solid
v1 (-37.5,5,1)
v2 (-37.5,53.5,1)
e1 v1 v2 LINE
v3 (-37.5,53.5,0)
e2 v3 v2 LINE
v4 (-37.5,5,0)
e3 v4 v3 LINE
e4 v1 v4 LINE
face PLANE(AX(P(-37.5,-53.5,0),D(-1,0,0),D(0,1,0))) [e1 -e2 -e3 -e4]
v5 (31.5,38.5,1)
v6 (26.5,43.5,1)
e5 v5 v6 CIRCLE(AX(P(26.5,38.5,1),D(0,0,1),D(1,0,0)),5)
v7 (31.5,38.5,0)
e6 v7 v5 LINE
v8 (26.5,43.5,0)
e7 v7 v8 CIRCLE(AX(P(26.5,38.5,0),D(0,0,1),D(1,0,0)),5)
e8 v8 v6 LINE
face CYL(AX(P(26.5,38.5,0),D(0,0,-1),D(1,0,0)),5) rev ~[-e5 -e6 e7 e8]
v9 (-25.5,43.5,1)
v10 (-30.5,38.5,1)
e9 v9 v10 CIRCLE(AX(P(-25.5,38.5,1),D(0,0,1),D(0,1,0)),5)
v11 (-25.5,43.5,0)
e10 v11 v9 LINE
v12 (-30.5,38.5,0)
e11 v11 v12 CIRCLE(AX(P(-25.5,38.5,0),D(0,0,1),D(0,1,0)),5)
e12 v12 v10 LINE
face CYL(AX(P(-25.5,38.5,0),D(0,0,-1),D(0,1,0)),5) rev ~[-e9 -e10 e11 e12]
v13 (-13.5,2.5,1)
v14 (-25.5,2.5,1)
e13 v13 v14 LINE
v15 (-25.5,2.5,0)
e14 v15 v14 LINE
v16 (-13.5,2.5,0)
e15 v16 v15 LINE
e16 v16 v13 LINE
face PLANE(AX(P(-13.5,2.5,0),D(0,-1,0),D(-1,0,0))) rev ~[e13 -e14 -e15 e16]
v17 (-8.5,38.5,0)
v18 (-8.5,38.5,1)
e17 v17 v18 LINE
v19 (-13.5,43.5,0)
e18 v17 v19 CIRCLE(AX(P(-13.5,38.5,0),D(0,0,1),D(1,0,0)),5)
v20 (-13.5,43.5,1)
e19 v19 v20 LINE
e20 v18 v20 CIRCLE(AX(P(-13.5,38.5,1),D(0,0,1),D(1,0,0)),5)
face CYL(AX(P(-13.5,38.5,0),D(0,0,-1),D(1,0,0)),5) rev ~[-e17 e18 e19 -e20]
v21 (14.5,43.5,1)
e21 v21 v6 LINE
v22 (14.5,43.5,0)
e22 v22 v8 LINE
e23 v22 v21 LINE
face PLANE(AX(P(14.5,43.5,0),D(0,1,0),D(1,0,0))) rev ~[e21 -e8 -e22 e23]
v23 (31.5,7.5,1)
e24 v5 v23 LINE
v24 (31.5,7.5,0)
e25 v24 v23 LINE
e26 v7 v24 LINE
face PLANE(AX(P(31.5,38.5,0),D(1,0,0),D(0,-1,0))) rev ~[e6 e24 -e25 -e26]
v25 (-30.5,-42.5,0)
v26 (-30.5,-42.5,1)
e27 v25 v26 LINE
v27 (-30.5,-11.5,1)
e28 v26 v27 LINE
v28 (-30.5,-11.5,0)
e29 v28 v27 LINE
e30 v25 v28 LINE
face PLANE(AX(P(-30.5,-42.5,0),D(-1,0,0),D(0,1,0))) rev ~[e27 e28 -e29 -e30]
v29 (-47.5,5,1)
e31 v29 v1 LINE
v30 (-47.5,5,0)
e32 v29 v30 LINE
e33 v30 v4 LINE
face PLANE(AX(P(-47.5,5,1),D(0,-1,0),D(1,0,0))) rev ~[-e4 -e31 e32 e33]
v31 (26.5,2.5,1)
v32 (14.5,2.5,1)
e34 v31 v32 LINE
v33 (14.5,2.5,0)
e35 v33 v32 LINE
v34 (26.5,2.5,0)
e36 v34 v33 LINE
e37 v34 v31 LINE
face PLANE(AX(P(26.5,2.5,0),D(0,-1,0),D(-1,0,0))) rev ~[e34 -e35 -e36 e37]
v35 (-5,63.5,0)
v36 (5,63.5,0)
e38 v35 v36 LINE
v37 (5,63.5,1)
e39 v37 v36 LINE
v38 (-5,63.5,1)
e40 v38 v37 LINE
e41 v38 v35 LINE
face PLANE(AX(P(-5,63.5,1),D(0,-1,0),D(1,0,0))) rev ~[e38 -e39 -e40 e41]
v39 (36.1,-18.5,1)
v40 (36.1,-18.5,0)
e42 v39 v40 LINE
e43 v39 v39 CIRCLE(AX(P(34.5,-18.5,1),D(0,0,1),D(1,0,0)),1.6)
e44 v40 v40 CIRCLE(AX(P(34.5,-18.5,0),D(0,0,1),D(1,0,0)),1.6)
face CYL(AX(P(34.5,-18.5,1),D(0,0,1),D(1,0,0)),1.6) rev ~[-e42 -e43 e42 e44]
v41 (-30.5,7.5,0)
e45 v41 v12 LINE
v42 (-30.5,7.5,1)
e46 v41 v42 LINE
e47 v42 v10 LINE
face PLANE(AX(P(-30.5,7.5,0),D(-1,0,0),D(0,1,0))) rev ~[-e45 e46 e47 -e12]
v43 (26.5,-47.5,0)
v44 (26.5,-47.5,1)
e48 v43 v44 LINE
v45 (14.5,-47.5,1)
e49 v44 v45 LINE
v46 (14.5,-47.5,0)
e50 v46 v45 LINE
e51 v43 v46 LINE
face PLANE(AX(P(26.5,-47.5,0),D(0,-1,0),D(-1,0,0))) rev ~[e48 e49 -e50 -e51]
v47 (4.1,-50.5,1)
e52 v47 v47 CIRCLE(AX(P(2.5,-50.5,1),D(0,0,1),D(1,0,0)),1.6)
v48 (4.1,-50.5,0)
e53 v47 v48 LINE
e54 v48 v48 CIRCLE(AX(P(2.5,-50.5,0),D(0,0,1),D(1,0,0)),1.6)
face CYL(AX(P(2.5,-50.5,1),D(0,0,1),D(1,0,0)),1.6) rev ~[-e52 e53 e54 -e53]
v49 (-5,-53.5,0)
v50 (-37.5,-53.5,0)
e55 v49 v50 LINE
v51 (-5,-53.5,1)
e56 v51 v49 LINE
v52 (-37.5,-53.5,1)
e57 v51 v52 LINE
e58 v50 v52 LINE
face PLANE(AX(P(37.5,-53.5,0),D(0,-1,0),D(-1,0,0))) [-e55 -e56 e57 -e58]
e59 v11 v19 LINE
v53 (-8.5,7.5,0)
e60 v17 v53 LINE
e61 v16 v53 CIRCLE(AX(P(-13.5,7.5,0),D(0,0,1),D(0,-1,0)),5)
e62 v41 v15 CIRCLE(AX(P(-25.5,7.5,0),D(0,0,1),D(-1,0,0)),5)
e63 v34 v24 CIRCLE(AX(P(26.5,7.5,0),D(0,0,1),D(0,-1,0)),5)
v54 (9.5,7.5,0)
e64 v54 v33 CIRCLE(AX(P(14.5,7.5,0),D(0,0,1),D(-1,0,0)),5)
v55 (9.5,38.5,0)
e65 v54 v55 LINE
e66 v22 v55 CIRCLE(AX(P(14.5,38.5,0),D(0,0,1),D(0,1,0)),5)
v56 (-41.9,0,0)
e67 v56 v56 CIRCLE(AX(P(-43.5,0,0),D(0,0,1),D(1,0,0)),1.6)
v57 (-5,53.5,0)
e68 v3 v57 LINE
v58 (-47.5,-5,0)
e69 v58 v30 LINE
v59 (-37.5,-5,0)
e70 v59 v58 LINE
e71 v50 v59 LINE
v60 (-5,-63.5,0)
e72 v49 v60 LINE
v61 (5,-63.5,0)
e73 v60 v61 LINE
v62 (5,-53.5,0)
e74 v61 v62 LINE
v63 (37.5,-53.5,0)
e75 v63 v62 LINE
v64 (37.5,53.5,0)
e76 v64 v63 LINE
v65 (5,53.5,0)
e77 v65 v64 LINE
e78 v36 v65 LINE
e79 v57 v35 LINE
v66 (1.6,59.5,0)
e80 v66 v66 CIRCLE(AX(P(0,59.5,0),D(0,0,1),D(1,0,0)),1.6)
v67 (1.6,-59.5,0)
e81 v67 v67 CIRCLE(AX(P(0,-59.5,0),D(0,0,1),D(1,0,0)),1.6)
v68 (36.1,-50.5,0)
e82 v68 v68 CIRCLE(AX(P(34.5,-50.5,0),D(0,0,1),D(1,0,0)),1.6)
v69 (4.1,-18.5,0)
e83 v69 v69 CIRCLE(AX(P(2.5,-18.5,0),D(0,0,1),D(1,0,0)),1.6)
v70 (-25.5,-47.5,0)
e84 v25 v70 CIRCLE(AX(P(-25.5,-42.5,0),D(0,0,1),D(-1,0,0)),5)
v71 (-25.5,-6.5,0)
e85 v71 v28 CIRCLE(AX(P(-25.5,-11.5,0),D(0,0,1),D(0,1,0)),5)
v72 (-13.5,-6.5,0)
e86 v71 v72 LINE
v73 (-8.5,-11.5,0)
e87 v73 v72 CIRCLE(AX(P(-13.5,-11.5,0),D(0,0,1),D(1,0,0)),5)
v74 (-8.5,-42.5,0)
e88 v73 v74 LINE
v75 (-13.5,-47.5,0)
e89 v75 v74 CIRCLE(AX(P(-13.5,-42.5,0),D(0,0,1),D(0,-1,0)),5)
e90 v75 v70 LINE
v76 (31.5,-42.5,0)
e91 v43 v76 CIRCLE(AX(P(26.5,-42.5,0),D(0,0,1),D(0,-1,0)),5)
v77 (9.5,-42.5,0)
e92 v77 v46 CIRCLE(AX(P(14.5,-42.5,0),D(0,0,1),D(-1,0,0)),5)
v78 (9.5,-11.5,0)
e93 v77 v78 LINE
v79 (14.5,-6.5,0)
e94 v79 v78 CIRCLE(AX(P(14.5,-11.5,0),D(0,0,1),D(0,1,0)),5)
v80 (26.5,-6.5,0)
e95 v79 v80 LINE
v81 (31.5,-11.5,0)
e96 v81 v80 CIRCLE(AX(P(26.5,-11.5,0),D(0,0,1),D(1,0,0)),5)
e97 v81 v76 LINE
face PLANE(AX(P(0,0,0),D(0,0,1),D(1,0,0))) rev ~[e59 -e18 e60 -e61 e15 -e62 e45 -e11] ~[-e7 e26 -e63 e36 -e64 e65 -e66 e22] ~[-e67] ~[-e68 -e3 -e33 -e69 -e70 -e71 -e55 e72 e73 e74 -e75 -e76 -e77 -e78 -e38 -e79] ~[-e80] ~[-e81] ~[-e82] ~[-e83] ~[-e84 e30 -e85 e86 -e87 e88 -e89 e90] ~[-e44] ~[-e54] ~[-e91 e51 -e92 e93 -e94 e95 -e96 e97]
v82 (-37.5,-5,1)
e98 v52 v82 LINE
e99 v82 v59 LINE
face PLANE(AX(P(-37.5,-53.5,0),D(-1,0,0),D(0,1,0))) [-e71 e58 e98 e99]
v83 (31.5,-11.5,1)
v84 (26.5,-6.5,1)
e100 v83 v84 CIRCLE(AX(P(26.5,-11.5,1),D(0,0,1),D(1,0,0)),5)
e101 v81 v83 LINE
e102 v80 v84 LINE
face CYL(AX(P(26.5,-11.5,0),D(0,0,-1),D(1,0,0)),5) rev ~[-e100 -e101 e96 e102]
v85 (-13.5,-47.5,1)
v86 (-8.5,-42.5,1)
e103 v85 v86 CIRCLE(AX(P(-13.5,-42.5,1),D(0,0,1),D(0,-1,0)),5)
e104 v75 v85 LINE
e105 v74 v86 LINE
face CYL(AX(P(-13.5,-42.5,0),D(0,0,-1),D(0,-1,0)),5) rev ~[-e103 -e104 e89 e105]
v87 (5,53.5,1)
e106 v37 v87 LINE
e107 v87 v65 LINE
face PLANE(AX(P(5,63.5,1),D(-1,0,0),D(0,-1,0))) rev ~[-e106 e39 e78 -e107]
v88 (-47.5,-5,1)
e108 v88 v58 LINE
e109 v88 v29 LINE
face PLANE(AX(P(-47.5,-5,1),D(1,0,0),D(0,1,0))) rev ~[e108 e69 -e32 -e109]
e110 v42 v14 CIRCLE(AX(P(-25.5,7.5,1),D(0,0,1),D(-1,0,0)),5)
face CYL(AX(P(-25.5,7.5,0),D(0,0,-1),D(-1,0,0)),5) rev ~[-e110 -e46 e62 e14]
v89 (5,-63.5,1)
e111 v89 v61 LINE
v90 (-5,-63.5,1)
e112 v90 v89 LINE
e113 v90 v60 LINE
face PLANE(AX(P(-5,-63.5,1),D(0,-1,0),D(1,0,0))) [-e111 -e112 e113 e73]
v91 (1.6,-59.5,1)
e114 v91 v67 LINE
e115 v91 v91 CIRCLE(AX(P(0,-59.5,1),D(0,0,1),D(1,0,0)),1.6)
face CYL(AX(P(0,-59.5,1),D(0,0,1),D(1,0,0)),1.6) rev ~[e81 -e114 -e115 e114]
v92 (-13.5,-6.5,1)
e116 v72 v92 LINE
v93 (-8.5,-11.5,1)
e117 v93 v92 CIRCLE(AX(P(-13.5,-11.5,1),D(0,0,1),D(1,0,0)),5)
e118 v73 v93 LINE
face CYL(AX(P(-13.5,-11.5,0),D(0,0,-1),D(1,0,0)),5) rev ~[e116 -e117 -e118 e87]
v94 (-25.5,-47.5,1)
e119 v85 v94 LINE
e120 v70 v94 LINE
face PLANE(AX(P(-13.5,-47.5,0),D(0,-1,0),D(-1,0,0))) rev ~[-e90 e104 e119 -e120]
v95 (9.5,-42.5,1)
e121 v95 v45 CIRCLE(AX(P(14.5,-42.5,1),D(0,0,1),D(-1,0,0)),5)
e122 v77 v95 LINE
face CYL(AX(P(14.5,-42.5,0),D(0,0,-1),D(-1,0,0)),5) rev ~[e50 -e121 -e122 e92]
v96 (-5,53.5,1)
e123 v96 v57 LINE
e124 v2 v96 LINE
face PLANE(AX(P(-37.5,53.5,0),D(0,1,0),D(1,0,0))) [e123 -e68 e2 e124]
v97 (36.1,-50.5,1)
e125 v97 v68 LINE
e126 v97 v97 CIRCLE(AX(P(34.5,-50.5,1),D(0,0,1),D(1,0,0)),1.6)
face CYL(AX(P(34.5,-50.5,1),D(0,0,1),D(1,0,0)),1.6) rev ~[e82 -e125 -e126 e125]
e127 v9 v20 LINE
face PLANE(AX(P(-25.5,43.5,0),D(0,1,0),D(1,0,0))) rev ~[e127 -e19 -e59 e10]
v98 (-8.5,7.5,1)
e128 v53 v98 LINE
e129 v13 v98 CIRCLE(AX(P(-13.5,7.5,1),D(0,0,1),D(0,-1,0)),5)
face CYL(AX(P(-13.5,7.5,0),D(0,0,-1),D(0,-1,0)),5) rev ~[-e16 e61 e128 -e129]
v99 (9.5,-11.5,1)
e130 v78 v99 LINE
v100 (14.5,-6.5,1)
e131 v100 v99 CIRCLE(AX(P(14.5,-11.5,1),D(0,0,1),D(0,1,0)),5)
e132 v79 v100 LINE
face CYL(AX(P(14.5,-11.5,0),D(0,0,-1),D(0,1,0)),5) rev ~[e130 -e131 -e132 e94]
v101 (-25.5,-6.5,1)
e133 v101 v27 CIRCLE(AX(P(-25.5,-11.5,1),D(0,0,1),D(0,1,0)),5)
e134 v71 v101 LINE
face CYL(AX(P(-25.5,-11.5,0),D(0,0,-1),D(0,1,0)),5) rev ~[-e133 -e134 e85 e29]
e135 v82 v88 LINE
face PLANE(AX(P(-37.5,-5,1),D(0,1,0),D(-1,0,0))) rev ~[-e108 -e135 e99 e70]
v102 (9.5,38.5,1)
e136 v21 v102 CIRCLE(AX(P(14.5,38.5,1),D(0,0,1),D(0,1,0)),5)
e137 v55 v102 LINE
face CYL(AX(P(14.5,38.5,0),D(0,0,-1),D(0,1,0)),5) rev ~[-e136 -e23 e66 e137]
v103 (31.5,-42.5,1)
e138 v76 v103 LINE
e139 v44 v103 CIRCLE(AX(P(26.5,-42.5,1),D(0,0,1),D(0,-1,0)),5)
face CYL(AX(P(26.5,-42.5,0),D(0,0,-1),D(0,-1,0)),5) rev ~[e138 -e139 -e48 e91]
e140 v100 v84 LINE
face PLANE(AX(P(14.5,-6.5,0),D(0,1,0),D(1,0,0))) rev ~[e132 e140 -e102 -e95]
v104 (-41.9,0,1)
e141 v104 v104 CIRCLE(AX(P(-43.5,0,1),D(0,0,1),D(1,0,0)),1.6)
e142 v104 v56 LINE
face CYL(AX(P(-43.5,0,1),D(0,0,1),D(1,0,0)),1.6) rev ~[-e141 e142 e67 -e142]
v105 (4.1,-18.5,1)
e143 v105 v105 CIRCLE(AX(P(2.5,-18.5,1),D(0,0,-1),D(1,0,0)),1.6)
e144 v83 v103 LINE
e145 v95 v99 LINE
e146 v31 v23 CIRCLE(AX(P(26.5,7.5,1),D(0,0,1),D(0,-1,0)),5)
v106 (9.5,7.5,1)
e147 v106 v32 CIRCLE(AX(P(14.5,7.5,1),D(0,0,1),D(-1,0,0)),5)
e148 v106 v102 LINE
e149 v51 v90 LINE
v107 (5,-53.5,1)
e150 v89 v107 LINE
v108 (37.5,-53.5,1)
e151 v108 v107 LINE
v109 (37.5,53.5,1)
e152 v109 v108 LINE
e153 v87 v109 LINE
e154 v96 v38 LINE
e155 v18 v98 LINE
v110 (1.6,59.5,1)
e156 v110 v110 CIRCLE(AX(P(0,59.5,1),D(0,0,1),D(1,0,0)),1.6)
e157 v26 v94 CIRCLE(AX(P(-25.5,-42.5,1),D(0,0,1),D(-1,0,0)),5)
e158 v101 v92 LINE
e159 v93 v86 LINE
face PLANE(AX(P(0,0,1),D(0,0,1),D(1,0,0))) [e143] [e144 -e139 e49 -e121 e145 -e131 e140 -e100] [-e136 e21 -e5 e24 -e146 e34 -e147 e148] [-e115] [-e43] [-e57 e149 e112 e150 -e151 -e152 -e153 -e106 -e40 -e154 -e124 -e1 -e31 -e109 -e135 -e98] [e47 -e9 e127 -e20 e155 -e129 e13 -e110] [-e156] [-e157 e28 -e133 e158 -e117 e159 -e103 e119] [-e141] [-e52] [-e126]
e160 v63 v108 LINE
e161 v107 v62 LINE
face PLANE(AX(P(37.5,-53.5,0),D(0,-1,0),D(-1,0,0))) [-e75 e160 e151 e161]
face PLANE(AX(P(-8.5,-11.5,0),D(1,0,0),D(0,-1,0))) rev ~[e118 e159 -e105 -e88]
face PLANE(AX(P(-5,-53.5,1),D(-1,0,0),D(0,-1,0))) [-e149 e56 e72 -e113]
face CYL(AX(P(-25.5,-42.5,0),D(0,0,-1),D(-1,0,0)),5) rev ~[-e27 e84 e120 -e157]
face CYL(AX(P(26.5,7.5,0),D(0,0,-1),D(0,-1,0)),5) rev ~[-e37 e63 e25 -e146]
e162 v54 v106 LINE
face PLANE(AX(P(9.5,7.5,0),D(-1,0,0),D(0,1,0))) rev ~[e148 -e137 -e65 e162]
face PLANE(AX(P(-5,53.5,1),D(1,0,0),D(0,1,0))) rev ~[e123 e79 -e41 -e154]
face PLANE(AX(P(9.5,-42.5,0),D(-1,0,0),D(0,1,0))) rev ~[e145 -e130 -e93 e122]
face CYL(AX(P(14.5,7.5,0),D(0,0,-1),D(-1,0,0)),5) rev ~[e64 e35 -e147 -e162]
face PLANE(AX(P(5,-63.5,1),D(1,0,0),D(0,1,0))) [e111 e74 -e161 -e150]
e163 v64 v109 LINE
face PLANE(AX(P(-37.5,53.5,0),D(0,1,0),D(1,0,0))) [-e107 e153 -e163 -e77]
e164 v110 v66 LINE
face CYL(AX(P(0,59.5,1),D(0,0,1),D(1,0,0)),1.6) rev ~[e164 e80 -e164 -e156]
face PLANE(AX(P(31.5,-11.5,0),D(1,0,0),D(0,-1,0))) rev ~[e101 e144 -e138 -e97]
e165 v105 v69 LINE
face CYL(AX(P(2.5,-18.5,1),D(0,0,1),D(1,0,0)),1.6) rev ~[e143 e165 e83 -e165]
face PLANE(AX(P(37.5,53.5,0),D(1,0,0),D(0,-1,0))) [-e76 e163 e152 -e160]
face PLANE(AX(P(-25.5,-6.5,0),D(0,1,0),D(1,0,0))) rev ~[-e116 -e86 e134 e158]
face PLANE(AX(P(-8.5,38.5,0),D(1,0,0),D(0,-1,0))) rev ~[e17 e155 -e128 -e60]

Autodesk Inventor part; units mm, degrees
ref_plane "YZ Plane" through (0, 0, 0) normal (1, 0, 0) x (0, 1, 0)
ref_plane "XZ Plane" through (0, 0, 0) normal (0, 1, 0) x (-1, 0, 0)
ref_plane "XY Plane" through (0, 0, 0) normal (0, 0, 1) x (1, 0, 0)
sketch "Sketch1" plane through (0, 0, 0) normal (0, 0, 1) x (1, 0, 0)
  line L0 (-37.5, 53.5) -> (37.5, 53.5)
  line L1 (37.5, 53.5) -> (37.5, -53.5)
  line L2 (37.5, -53.5) -> (-37.5, -53.5)
  line L3 (-37.5, -53.5) -> (-37.5, 53.5)
  line L4 (-37.5, 53.5) -> (37.5, -53.5) construction
  line L5 (37.5, 53.5) -> (-37.5, -53.5) construction
  line L6 (-25.5, 43.5) -> (-13.5, 43.5)
  line L7 (-8.5, 38.5) -> (-8.5, 7.5)
  line L8 (-13.5, 2.5) -> (-25.5, 2.5)
  line L9 (-30.5, 7.5) -> (-30.5, 38.5)
  line L10 (-30.5, 43.5) -> (-8.5, 2.5) construction
  line L11 (-8.5, 43.5) -> (-30.5, 2.5) construction
  arc A0 (-25.5, 43.5) -> (-30.5, 38.5) centre (-25.5, 38.5) ccw
  arc A1 (-8.5, 38.5) -> (-13.5, 43.5) centre (-13.5, 38.5) ccw
  arc A2 (-13.5, 2.5) -> (-8.5, 7.5) centre (-13.5, 7.5) ccw
  arc A3 (-30.5, 7.5) -> (-25.5, 2.5) centre (-25.5, 7.5) ccw
  line L12 (9.5, 7.5) -> (9.5, 38.5)
  arc A4 (26.5, 2.5) -> (31.5, 7.5) centre (26.5, 7.5) ccw
  arc A5 (14.5, 43.5) -> (9.5, 38.5) centre (14.5, 38.5) ccw
  arc A6 (31.5, 38.5) -> (26.5, 43.5) centre (26.5, 38.5) ccw
  arc A7 (9.5, 7.5) -> (14.5, 2.5) centre (14.5, 7.5) ccw
  line L13 (26.5, 2.5) -> (14.5, 2.5)
  line L14 (31.5, 38.5) -> (31.5, 7.5)
  line L15 (9.5, 43.5) -> (31.5, 2.5) construction
  line L16 (14.5, 43.5) -> (26.5, 43.5)
  line L17 (31.5, 43.5) -> (9.5, 2.5) construction
  line L18 (-30.5, -42.5) -> (-30.5, -11.5)
  arc A8 (-13.5, -47.5) -> (-8.5, -42.5) centre (-13.5, -42.5) ccw
  arc A9 (-25.5, -6.5) -> (-30.5, -11.5) centre (-25.5, -11.5) ccw
  arc A10 (-8.5, -11.5) -> (-13.5, -6.5) centre (-13.5, -11.5) ccw
  arc A11 (-30.5, -42.5) -> (-25.5, -47.5) centre (-25.5, -42.5) ccw
  line L19 (-13.5, -47.5) -> (-25.5, -47.5)
  line L20 (-8.5, -11.5) -> (-8.5, -42.5)
  line L21 (-30.5, -6.5) -> (-8.5, -47.5) construction
  line L22 (-25.5, -6.5) -> (-13.5, -6.5)
  line L23 (-8.5, -6.5) -> (-30.5, -47.5) construction
  line L24 (9.5, -42.5) -> (9.5, -11.5)
  arc A12 (26.5, -47.5) -> (31.5, -42.5) centre (26.5, -42.5) ccw
  arc A13 (14.5, -6.5) -> (9.5, -11.5) centre (14.5, -11.5) ccw
  arc A14 (31.5, -11.5) -> (26.5, -6.5) centre (26.5, -11.5) ccw
  arc A15 (9.5, -42.5) -> (14.5, -47.5) centre (14.5, -42.5) ccw
  line L25 (26.5, -47.5) -> (14.5, -47.5)
  line L26 (31.5, -11.5) -> (31.5, -42.5)
  line L27 (9.5, -6.5) -> (31.5, -47.5) construction
  line L28 (14.5, -6.5) -> (26.5, -6.5)
  line L29 (31.5, -6.5) -> (9.5, -47.5) construction
  line L30 (0, 0) -> (0, 8.3009)
  line L31 (0, 0) -> (4.4939, 0)
  point P0 (-19.5, 23)
  point P1 (20.5, 23)
  point P2 (-19.5, -27)
  point P3 (20.5, -27)
  dimension "d0" = 107
  dimension "d1" = 75
  dimension "d3" = 22
  dimension "d4" = 41
  dimension "d5" = 5
  dimension "d8" = 40
  dimension "d11" = 50
  dimension "d14" = 10
  dimension "d15" = 7
extrude "Plate1" add sketch "Sketch1" along normal blind 1
sketch "Sketch2" plane through (0, 0, 1) normal (0, 0, 1) x (1, 0, 0)
  line L0 (37.5, 53.5) -> (37.5, -53.5)
  line L1 (-37.5, -53.5) -> (-37.5, 53.5)
  line L2 (-47.5, 5) -> (-37.5, 5)
  line L3 (-37.5, 5) -> (-37.5, -5)
  line L4 (-37.5, -5) -> (-47.5, -5)
  line L5 (-47.5, -5) -> (-47.5, 5)
  line L6 (-47.5, 5) -> (-37.5, -5) construction
  line L7 (-37.5, 5) -> (-47.5, -5) construction
  line L8 (-37.5, 53.5) -> (37.5, 53.5)
  line L9 (-5, 63.5) -> (5, 63.5)
  line L10 (5, 63.5) -> (5, 53.5)
  line L11 (5, 53.5) -> (-5, 53.5)
  line L12 (-5, 53.5) -> (-5, 63.5)
  line L13 (-5, 63.5) -> (5, 53.5) construction
  line L14 (5, 63.5) -> (-5, 53.5) construction
  line L15 (0, 0) -> (10.0151, 0)
  line L16 (-5, -63.5) -> (5, -63.5)
  line L17 (5, -63.5) -> (5, -53.5)
  line L18 (5, -53.5) -> (-5, -53.5)
  line L19 (-5, -53.5) -> (-5, -63.5)
  line L20 (-5, -63.5) -> (5, -53.5) construction
  line L21 (5, -63.5) -> (-5, -53.5) construction
  circle A0 centre (0, 59.5) radius 1.6
  circle A1 centre (-43.5, 0) radius 1.6
  circle A2 centre (0, -59.5) radius 1.6
  point P0 (-42.5, 0)
  point P1 (0, 58.5)
  point P2 (0, -58.5)
  point P3 (37.5, 38.5)
  dimension "d23" = 10
  dimension "d24" = 10
  dimension "d27" = 10
  dimension "d28" = 10
  dimension "d43" = 3.2
  dimension "d44" = 3.2
  dimension "d45" = 4
  dimension "d46" = 4
sheet face with bend "Face2" sketch "Sketch2" thickness 1 toward (0, 0, -1) bend radius 1
bend "Bend1"
sketch "Sketch3" plane through (0, 0, 1) normal (0, 0, 1) x (1, 0, 0)
  circle A0 centre (2.5, -18.5) radius 1.6
  line L0 (2.5, -18.5) -> (11.3604, -18.5)
  line L1 (2.5, -18.5) -> (2.5, -34.5603)
  circle A1 centre (34.5, -18.5) radius 1.6
  circle A2 centre (2.5, -50.5) radius 1.6
  circle A3 centre (34.5, -50.5) radius 1.6
  line L2 (37.5, 53.5) -> (37.5, -53.5) projected
  line L3 (37.5, -53.5) -> (5, -53.5) projected
  point P0 (0, 0)
  dimension "d48" = 3.2
  dimension "d51" = 32
  dimension "d54" = 32
  dimension "d57" = 35
  dimension "d58" = 35
extrude "Cut1" cut sketch "Sketch3" against normal blind 1
equation "\"d59\" = 厚度"
equation "\"d2\" = 厚度"
equation "\"d37\" = 折彎半徑"
equation "\"d38\" = 折彎離隙寬度"
equation "\"d40\" = 最小剩餘"
equation "\"d39\" = 折彎離隙深度"
equation "\"d41\" = 轉移半徑"
equation "\"折彎半徑\" = 厚度"
equation "\"折彎離隙寬度\" = 厚度"
equation "\"折彎離隙深度\" = 0.5 * 厚度"
equation "\"轉角離隙大小\" = 4 * 厚度"
equation "\"最小剩餘\" = 2 * 厚度"
equation "\"轉移半徑\" = 折彎半徑"
equation "\"Jacobi半徑大小\" = 折彎半徑"
equation "\"間隙大小\" = 厚度"
equation "\"厚度\" = 1"
properties part number "PCB_board_box_right" material "Aluminum"
